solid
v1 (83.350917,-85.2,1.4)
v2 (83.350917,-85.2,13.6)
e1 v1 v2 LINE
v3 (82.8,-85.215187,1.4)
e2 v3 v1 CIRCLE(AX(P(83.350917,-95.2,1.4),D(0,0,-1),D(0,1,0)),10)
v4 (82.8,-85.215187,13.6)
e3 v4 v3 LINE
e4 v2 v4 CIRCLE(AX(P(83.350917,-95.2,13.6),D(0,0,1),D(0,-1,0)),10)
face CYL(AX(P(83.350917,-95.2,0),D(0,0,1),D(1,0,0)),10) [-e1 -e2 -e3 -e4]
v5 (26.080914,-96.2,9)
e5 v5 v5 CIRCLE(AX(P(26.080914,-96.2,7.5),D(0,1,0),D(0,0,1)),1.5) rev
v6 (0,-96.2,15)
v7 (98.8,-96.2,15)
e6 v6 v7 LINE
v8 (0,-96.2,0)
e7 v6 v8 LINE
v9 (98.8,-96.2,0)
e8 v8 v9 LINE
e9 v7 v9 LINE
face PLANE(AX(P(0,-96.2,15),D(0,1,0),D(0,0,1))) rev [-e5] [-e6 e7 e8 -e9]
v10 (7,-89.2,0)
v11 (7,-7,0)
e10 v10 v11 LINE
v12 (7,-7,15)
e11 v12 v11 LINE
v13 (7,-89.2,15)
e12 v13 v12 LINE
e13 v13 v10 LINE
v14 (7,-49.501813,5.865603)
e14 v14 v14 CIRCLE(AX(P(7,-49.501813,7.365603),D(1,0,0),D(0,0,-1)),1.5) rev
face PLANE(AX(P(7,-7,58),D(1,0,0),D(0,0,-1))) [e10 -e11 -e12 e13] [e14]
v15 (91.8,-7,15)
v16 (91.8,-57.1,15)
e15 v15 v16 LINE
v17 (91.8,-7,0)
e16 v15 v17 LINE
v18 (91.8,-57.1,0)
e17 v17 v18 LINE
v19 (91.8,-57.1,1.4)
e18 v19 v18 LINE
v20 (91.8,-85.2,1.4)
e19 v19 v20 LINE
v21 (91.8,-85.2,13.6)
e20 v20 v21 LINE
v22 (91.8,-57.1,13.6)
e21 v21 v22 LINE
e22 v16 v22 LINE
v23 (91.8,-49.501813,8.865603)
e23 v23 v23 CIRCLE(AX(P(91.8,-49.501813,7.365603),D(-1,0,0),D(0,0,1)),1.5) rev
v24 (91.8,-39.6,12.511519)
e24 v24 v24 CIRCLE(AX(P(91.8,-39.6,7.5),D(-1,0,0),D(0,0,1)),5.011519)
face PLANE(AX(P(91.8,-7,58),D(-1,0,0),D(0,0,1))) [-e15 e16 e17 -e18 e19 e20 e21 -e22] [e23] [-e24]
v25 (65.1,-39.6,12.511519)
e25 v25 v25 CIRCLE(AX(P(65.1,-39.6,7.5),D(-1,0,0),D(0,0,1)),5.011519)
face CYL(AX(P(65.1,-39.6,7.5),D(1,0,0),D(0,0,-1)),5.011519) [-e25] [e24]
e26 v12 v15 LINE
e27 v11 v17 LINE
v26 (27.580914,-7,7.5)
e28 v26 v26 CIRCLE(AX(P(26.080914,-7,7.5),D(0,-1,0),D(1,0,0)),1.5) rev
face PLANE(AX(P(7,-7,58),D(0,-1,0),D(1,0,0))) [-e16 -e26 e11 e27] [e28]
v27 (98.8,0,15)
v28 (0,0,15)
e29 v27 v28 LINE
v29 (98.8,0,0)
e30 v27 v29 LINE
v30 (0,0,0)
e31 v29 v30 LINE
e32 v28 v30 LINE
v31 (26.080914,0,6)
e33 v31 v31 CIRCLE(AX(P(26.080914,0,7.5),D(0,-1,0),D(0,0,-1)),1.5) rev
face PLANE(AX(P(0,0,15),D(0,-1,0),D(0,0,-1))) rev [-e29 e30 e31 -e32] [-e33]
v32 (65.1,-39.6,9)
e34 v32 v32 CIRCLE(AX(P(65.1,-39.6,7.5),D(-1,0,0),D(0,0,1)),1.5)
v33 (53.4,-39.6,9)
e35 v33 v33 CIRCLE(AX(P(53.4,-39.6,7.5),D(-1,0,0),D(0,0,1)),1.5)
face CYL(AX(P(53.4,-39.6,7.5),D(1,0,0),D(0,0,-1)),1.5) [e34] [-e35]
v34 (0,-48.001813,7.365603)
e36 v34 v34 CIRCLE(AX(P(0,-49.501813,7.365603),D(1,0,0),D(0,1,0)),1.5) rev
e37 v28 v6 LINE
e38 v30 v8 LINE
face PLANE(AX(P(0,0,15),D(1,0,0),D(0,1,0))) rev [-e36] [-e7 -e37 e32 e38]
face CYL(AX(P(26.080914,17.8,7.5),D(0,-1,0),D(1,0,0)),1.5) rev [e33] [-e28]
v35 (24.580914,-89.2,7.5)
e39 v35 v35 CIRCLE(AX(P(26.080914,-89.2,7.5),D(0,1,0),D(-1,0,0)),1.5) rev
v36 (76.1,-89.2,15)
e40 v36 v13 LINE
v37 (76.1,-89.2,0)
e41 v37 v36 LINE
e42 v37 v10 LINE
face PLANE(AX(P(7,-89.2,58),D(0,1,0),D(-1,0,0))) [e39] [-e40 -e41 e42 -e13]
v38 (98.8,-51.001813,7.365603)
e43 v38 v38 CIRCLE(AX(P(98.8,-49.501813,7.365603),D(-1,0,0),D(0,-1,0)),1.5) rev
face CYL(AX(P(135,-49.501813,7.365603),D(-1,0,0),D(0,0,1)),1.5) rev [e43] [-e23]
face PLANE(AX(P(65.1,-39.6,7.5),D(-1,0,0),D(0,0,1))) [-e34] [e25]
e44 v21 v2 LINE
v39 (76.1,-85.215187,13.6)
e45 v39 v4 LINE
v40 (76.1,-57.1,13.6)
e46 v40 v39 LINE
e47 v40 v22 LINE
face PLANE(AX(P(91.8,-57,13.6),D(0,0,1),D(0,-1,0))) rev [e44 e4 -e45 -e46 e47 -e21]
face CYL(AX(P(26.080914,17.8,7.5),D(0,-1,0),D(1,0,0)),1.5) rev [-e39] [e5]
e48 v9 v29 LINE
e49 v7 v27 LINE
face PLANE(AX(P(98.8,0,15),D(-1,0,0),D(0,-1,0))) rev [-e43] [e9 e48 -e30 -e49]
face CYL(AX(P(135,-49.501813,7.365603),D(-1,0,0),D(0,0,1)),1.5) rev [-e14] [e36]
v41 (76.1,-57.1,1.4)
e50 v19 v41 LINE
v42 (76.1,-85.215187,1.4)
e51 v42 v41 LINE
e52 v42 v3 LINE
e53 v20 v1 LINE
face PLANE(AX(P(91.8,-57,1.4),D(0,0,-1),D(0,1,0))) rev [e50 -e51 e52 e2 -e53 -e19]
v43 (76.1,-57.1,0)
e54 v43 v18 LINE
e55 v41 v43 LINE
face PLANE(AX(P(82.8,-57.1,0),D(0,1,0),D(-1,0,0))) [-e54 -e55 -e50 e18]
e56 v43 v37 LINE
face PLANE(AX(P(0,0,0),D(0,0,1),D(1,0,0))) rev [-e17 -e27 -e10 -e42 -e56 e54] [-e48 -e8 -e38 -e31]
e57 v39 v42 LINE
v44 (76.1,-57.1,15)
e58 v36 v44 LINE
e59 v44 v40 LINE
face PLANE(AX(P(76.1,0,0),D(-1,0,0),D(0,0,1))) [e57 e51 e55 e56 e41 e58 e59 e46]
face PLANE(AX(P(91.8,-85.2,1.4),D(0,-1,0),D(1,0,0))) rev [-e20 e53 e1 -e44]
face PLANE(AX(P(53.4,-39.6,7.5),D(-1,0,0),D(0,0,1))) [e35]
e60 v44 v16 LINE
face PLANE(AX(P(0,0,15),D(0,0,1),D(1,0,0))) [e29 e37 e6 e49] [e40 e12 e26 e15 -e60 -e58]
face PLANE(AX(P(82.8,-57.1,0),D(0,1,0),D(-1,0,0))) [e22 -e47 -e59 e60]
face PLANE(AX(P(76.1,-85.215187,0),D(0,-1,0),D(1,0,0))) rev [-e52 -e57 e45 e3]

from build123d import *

# Parameters (mm, degrees)
SKETCH_1_W               = 98.8
SKETCH_1_H               = 96.2
EXTRUDE_2_DEPTH          = 15
CUT_EXTRUDE_1_DEPTH      = 43
CUT_EXTRUDE_1_DEPTH_BACK = 57
SKETCH_4_W               = 84.8
SKETCH_4_H               = 82.2
SKETCH_10_W              = 15
SKETCH_10_H              = 32.1
EXTRUDE_4_DEPTH          = 16
SKETCH_11_W              = 12.2
SKETCH_11_H              = 28.2
CUT_EXTRUDE_2_DEPTH      = 9
SKETCH_12_R              = 5.011519167
EXTRUDE_5_DEPTH          = 26.7
SKETCH_13_R              = 1.5
EXTRUDE_6_DEPTH          = 11.7
SKETCH_14_W              = 15
SKETCH_14_H              = 3.984812986
EXTRUDE_7_DEPTH          = 6.7
FILLET_1_R               = 10
SKETCH_15_W              = 1.4
SKETCH_15_H              = 28.115187014
EXTRUDE_8_DEPTH          = 6.7
SKETCH_17_W              = 1.4
SKETCH_17_H              = 28.115187014
EXTRUDE_9_DEPTH          = 6.7
CUT_EXTRUDE_3_DEPTH      = 128
CUT_EXTRUDE_3_DEPTH_BACK = 32.7
SKETCH_18_R              = 1.5
CUT_EXTRUDE_4_DEPTH      = 107
CUT_EXTRUDE_4_DEPTH_BACK = 39.7
SKETCH_19_R              = 1.5


with BuildPart() as part:
    # Эскиз1 → Бобышка-Вытянуть2 (new body)
    with BuildSketch(Plane.XY):
        with Locations((49.4, -48.1)):
            Rectangle(SKETCH_1_W, SKETCH_1_H)
    extrude(amount=EXTRUDE_2_DEPTH)

    # Эскиз4 → Вырез-Вытянуть1 (cut, two sides: drawn at the far end of the back side and taken through both)
    with BuildSketch(Plane.XY.offset(15).offset(-CUT_EXTRUDE_1_DEPTH_BACK)):
        with Locations((49.4, -48.1)):
            Rectangle(SKETCH_4_W, SKETCH_4_H)
    extrude(amount=CUT_EXTRUDE_1_DEPTH + CUT_EXTRUDE_1_DEPTH_BACK, mode=Mode.SUBTRACT)

    # Эскиз10 → Бобышка-Вытянуть4 (add)
    with BuildSketch(Plane(origin=(98.8, 0, 0), x_dir=(0, 0, -1), z_dir=(1, 0, 0))):
        with Locations((-7.5, -73.15)):
            Rectangle(SKETCH_10_W, SKETCH_10_H)
    extrude(amount=-EXTRUDE_4_DEPTH)

    # Эскиз11 → Вырез-Вытянуть2 (cut)
    with BuildSketch(Plane.ZY.offset(-82.8)):
        with Locations((7.5, -71.1)):
            Rectangle(SKETCH_11_W, SKETCH_11_H)
    extrude(amount=-CUT_EXTRUDE_2_DEPTH, mode=Mode.SUBTRACT)

    # Эскиз12 → Бобышка-Вытянуть5 (add)
    with BuildSketch(Plane.ZY.offset(-91.8)):
        with Locations((7.5, -39.6)):
            Circle(SKETCH_12_R)
    extrude(amount=EXTRUDE_5_DEPTH)

    # Эскиз13 → Бобышка-Вытянуть6 (add)
    with BuildSketch(Plane.ZY.offset(-65.1)):
        with Locations((7.5, -39.6)):
            Circle(SKETCH_13_R)
    extrude(amount=EXTRUDE_6_DEPTH)

    # Эскиз14 → Бобышка-Вытянуть7 (add)
    with BuildSketch(Plane.ZY.offset(-82.8)):
        with Locations((7.5, -87.207593507)):
            Rectangle(SKETCH_14_W, SKETCH_14_H)
    extrude(amount=EXTRUDE_7_DEPTH)

    # Скругление1
    # the kernel refuses this fillet: 10 mm, written as the material it takes off along each edge
    with BuildSketch(Plane(origin=(82.8, -85.2, 13.6), x_dir=(0, -1, 0), z_dir=(0, 0, -1))) as fillet_1_piece_1:
        with BuildLine():
            CenterArc((10, -0.550917082), FILLET_1_R, 176.841878722, 3.158121278)
            Line((0, -0.550917082), (0, 0))
            Line((0, 0), (0.015187014, 0))
        make_face()
    extrude(amount=12.2, mode=Mode.SUBTRACT)

    # Эскиз15 → Бобышка-Вытянуть8 (add)
    with BuildSketch(Plane.ZY.offset(-82.8)):
        with Locations((0.7, -71.157593507)):
            Rectangle(SKETCH_15_W, SKETCH_15_H)
    extrude(amount=EXTRUDE_8_DEPTH)

    # Эскиз17 → Бобышка-Вытянуть9 (add)
    with BuildSketch(Plane.ZY.offset(-82.8)):
        with Locations((14.3, -71.157593507)):
            Rectangle(SKETCH_17_W, SKETCH_17_H)
    extrude(amount=EXTRUDE_9_DEPTH)

    # Эскиз18 → Вырез-Вытянуть3 (cut, two sides: drawn at the far end of the back side and taken through both)
    with BuildSketch(Plane(origin=(7, 0, 0), x_dir=(0, 0, -1), z_dir=(1, 0, 0)).offset(-CUT_EXTRUDE_3_DEPTH_BACK)):
        with Locations(Location((-7.365603058, -49.501812711, 0), (0, 0, 180))):
            Circle(SKETCH_18_R)
    extrude(amount=CUT_EXTRUDE_3_DEPTH + CUT_EXTRUDE_3_DEPTH_BACK, mode=Mode.SUBTRACT)

    # Эскиз19 → Вырез-Вытянуть4 (cut, two sides: drawn at the far end of the back side and taken through both)
    with BuildSketch(Plane(origin=(0, -89.2, 0), x_dir=(1, 0, 0), z_dir=(0, 1, 0)).offset(-CUT_EXTRUDE_4_DEPTH_BACK)):
        with Locations((26.080914384, -7.5)):
            Circle(SKETCH_19_R)
    extrude(amount=CUT_EXTRUDE_4_DEPTH + CUT_EXTRUDE_4_DEPTH_BACK, mode=Mode.SUBTRACT)


solid = part.part
